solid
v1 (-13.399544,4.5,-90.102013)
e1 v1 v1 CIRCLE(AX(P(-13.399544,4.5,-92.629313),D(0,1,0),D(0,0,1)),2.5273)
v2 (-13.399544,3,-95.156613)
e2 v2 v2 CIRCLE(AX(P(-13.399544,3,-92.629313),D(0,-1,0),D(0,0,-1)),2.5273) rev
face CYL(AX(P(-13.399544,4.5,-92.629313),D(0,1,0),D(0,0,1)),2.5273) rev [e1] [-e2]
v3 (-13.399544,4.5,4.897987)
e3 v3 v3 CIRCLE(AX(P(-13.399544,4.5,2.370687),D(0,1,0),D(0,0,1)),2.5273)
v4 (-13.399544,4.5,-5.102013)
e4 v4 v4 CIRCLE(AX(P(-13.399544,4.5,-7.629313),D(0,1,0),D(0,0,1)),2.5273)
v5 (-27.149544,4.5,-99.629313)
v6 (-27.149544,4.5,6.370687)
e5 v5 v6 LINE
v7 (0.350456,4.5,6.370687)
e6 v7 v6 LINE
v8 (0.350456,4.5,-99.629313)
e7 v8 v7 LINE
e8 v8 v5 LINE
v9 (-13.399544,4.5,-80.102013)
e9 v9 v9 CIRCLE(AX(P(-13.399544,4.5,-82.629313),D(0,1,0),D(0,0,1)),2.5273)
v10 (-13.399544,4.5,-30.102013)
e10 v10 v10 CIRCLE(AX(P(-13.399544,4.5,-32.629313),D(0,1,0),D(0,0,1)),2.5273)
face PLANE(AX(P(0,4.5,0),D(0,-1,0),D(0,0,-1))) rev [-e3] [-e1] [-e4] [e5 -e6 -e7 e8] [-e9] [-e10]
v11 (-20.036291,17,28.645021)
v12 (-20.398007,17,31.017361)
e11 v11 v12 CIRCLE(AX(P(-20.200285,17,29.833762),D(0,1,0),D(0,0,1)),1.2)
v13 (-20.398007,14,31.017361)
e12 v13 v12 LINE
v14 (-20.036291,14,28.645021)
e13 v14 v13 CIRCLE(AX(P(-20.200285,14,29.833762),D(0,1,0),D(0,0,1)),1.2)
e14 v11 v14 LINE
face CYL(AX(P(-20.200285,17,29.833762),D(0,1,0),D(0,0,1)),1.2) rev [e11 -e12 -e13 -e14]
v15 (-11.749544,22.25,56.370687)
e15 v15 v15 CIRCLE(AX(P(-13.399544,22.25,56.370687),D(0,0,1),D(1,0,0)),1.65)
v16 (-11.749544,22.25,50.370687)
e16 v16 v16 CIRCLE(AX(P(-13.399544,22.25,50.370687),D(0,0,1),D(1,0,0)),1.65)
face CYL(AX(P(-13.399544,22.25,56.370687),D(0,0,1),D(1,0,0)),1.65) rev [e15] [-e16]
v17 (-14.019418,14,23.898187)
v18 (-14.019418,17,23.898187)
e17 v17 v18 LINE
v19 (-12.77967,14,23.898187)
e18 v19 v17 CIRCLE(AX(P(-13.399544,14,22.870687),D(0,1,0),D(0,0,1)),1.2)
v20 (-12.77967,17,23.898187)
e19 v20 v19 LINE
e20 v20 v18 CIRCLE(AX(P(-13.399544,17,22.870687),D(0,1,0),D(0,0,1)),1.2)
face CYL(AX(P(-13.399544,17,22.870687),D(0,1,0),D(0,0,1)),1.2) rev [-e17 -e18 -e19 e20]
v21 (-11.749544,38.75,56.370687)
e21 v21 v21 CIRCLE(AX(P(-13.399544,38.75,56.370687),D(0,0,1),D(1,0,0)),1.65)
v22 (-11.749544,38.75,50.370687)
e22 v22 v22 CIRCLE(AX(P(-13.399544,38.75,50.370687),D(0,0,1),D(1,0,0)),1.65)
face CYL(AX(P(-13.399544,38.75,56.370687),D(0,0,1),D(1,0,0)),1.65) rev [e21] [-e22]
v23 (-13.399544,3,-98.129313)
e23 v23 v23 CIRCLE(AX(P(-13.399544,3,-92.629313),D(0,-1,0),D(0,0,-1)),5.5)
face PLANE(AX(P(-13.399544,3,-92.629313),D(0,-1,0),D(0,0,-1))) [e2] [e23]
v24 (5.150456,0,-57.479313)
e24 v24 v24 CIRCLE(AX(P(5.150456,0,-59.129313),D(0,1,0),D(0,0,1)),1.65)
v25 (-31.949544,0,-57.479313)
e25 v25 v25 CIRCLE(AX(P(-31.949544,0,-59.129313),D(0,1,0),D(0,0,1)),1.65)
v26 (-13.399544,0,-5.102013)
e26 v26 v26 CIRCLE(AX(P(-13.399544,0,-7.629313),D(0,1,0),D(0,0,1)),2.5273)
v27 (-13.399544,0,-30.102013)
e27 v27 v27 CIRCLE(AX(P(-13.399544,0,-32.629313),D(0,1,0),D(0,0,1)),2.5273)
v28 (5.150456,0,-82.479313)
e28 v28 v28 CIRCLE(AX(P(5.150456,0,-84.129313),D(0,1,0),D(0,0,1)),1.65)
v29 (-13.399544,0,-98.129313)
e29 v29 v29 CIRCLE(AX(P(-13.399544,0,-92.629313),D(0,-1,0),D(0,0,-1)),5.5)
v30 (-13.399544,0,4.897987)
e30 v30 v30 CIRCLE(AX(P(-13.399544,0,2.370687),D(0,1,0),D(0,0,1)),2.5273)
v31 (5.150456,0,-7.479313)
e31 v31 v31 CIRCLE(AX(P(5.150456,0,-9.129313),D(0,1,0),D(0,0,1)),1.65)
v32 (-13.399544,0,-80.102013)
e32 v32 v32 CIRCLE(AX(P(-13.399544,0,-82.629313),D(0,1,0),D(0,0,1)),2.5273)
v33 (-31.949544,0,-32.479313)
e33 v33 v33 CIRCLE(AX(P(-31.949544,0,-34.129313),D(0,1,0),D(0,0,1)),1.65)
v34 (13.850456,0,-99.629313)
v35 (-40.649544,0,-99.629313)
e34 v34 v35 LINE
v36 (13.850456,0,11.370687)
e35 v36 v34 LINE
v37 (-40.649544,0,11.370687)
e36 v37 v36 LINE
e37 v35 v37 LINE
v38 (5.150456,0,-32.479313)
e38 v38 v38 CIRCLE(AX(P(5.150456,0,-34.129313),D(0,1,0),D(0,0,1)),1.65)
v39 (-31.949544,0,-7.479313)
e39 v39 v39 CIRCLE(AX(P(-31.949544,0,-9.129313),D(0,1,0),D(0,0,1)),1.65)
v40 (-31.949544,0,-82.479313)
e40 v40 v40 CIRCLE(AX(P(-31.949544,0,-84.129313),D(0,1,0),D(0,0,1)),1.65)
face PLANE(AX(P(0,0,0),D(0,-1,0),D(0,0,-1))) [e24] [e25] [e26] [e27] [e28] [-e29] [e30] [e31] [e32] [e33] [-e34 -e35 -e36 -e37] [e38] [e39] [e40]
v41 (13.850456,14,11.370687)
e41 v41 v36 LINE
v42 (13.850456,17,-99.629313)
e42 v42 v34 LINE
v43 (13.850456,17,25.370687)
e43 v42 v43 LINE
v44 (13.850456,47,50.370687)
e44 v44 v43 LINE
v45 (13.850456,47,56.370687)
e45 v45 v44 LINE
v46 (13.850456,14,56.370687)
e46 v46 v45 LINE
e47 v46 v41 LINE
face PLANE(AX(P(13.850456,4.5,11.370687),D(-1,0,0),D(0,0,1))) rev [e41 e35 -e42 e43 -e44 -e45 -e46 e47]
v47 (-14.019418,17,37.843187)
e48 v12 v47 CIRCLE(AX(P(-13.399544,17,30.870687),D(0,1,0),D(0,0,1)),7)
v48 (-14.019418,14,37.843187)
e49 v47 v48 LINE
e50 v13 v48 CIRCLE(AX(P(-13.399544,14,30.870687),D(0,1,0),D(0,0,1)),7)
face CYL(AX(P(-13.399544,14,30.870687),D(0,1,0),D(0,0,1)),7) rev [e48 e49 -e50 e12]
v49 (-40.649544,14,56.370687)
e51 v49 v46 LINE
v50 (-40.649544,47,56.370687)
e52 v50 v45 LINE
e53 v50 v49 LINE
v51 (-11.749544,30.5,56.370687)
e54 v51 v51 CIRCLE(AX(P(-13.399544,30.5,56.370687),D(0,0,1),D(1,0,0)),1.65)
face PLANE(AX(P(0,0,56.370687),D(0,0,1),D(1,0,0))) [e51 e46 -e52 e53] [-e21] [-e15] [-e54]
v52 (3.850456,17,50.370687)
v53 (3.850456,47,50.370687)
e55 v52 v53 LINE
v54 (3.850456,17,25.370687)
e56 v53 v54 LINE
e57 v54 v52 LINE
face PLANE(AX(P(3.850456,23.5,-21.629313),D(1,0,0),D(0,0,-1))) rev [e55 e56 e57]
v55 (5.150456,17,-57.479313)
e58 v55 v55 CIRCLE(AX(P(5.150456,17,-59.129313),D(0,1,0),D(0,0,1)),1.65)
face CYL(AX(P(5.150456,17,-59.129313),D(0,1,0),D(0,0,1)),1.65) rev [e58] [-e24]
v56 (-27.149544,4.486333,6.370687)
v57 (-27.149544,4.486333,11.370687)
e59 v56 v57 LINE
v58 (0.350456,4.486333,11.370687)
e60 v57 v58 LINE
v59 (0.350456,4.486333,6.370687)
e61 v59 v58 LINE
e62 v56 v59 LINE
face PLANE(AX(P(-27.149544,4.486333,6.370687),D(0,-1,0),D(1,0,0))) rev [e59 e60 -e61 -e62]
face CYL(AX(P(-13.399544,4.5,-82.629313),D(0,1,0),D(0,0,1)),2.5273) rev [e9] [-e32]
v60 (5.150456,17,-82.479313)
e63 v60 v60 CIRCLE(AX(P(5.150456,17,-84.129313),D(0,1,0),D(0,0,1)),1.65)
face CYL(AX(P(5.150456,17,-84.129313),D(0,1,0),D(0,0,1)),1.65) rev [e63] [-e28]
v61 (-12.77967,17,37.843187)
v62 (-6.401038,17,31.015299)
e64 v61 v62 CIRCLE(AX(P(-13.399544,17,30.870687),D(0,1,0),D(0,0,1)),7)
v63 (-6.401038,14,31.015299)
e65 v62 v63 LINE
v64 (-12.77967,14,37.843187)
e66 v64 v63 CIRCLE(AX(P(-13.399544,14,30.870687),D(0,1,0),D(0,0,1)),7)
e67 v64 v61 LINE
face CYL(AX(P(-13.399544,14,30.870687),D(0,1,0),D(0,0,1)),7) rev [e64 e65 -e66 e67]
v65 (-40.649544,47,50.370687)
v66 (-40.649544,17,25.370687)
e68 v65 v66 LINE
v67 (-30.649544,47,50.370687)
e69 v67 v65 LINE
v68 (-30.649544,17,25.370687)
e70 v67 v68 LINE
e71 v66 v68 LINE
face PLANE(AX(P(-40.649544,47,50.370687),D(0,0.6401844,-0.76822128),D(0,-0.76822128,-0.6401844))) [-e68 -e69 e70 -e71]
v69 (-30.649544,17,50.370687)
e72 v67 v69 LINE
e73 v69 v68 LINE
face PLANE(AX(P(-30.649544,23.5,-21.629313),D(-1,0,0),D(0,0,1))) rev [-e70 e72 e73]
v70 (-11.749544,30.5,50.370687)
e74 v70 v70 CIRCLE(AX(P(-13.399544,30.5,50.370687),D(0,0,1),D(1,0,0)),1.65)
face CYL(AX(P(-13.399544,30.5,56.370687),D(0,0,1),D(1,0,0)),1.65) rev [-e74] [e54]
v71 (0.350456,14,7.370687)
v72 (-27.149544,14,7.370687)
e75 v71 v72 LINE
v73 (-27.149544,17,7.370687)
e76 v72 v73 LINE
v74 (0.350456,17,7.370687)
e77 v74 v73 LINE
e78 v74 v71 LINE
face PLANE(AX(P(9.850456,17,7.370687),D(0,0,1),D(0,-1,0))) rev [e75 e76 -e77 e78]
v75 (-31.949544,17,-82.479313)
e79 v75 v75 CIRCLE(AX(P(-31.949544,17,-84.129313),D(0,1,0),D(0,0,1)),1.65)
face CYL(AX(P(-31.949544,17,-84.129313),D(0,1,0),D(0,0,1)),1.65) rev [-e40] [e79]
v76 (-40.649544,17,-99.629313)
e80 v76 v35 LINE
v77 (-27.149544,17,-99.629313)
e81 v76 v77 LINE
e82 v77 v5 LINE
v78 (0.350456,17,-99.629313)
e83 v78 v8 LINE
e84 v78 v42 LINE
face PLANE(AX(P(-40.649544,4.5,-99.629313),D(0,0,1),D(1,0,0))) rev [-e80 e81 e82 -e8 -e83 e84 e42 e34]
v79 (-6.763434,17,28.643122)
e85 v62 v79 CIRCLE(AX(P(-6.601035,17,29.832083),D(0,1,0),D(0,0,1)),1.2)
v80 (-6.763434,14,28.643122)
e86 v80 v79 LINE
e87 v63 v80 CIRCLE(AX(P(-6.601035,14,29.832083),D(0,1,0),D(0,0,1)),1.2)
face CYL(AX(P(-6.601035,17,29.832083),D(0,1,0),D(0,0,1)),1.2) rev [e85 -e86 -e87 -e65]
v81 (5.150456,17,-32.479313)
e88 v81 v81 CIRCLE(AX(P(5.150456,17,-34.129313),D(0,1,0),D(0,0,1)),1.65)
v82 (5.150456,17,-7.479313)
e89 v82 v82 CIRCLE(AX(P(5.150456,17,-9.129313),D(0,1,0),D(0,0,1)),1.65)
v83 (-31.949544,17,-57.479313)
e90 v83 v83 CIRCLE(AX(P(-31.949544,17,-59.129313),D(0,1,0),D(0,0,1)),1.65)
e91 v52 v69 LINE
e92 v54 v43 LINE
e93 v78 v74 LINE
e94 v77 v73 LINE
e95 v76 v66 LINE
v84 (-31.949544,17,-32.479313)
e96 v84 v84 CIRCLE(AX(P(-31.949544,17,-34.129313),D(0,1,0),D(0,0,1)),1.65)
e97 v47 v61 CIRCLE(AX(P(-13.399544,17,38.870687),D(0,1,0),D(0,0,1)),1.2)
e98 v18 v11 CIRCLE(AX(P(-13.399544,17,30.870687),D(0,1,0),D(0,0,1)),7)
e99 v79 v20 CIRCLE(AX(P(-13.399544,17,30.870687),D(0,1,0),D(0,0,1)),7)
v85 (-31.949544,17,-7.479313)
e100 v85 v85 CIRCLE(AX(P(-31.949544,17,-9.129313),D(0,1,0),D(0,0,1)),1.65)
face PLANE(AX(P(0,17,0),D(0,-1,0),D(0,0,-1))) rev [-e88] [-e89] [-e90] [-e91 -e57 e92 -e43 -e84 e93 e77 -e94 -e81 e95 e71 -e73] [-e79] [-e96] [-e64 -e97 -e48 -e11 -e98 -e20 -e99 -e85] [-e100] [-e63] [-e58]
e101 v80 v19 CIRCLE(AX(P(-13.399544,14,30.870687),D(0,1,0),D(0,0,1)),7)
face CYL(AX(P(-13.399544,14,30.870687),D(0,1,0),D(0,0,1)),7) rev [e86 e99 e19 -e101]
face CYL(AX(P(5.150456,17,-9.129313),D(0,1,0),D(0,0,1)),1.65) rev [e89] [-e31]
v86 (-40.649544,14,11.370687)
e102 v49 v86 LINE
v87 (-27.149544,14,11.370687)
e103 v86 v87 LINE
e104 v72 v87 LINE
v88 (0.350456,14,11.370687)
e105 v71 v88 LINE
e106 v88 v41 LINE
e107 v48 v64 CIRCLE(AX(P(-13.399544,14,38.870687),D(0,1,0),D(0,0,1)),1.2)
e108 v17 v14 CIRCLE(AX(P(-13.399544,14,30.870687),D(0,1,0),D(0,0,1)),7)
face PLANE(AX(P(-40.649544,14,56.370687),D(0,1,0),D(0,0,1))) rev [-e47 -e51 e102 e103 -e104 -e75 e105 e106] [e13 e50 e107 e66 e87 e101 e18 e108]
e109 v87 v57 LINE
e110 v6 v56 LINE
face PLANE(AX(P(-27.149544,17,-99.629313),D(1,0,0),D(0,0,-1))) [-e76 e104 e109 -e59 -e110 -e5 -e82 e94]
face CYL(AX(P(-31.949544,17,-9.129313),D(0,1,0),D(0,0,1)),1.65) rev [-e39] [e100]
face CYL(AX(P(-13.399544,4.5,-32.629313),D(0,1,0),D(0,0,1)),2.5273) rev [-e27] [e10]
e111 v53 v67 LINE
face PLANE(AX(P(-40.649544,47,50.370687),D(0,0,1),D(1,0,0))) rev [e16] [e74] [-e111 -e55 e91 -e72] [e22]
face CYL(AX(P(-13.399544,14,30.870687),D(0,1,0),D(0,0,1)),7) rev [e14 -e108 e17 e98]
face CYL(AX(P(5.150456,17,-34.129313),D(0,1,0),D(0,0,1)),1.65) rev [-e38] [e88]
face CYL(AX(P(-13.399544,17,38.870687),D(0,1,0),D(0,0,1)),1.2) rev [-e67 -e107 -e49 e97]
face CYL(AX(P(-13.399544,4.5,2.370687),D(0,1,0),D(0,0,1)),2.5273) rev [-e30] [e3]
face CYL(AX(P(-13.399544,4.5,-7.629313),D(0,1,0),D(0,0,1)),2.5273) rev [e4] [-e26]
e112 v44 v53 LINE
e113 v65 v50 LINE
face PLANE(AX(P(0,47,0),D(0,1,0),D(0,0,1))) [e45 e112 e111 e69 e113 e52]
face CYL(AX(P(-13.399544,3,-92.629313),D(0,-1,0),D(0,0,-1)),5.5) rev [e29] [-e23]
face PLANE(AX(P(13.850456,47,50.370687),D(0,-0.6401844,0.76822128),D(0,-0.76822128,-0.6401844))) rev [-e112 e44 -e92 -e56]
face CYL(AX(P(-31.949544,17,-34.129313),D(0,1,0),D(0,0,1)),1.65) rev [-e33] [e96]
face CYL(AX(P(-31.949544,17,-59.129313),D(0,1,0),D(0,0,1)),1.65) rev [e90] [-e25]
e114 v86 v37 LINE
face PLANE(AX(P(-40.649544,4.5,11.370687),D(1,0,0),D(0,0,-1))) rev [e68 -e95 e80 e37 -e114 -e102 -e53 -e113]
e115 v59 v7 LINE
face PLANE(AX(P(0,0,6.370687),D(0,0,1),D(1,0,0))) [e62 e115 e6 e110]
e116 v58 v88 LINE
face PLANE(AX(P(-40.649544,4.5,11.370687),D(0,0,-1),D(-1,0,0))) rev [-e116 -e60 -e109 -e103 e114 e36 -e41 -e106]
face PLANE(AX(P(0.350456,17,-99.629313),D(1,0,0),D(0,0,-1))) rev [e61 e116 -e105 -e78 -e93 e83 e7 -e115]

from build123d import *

# Parameters (mm, degrees)
SKETCH1_W                           = 54.5
SKETCH1_H                           = 111
BOSS_EXTRUDE1_DEPTH                 = 4.5
SKETCH2_W                           = 13.5
SKETCH2_H                           = 111
BOSS_EXTRUDE2_DEPTH                 = 12.5
M4X0_7_TAPPED_HOLE1_D               = 3.3
SKETCH6_W                           = 4
SKETCH6_H                           = 12.5
BOSS_EXTRUDE3_DEPTH                 = 37
SKETCH7_W                           = 54.5
SKETCH7_H                           = 3
BOSS_EXTRUDE5_DEPTH                 = 45
SKETCH8_R                           = 7
CUT_EXTRUDE1_DEPTH                  = 3
M2_CLEARANCE_HOLE1_D                = 2.4
F_8_0_199_DIAMETER_HOLE1_D          = 5.0546
SKETCH12_R                          = 5.5
CUT_EXTRUDE3_DEPTH                  = 3
SKETCH13_W                          = 27.5
SKETCH13_H                          = 9.513667368
CUT_EXTRUDE4_DEPTH                  = 5
SKETCH14_W                          = 54.5
SKETCH14_H                          = 6
BOSS_EXTRUDE6_DEPTH                 = 30
RIB6_REACH                          = 124.903
SKETCH20_WALL_W                     = 286.858082508
SKETCH20_WALL_H                     = 10
TAP_START                           = 50.370687416
TAP_DRILL_FOR_M4X0_7_TAP1_OUTLINE_R = 1.65
TAP_DRILL_FOR_M4X0_7_TAP1_DEPTH     = 6
TAP_START_2                         = -40.649543841
TAP_DRILL_FOR_M4X0_7_TAP1_2_DEPTH   = 10


with BuildPart() as part:
    # Sketch1 → Boss-Extrude1 (new body)
    with BuildSketch(Plane(origin=(0, 0, 0), x_dir=(1, 0, 0), z_dir=(0, 1, 0))):
        with Locations((-13.399543841, 44.129312584)):
            Rectangle(SKETCH1_W, SKETCH1_H)
    extrude(amount=BOSS_EXTRUDE1_DEPTH)

    # Sketch2 → Boss-Extrude2 (add)
    with BuildSketch(Plane(origin=(0, 4.5, 0), x_dir=(1, 0, 0), z_dir=(0, 1, 0))):
        with Locations((7.100456159, 44.129312584)):
            Rectangle(SKETCH2_W, SKETCH2_H)
        with Locations((-33.899543841, 44.129312584)):
            Rectangle(SKETCH2_W, SKETCH2_H)
    extrude(amount=BOSS_EXTRUDE2_DEPTH)

    # M4x0.7 Tapped Hole1 (through all)
    with Locations(Plane(origin=(-31.949543841, 17, -9.129312584), x_dir=(0, 0, 1), z_dir=(0, 1, 0))):
        with Locations((0, 0), (-25, 0), (-50, 0), (-75, 0), (0, 37.1), (-25, 37.1), (-50, 37.1), (-75, 37.1)):
            Hole(M4X0_7_TAPPED_HOLE1_D / 2)

    # Sketch6 → Boss-Extrude3 (add)
    with BuildSketch(Plane(origin=(-27.149543841, 0, 0), x_dir=(0, 0, -1), z_dir=(1, 0, 0))):
        with Locations((-9.370687416, 10.75)):
            Rectangle(SKETCH6_W, SKETCH6_H)
    extrude(amount=BOSS_EXTRUDE3_DEPTH)

    # Sketch7 → Boss-Extrude5 (add)
    with BuildSketch(Plane.XY.offset(11.370687416)):
        with Locations((-13.399543841, 15.5)):
            Rectangle(SKETCH7_W, SKETCH7_H)
    extrude(amount=BOSS_EXTRUDE5_DEPTH)

    # Sketch8 → Cut-Extrude1 (cut)
    with BuildSketch(Plane(origin=(0, 17, 0), x_dir=(1, 0, 0), z_dir=(0, 1, 0))):
        with Locations(Location((-13.399543841, -30.870687416, 0), (0, 0, 270))):
            Circle(SKETCH8_R)
    extrude(amount=-CUT_EXTRUDE1_DEPTH, mode=Mode.SUBTRACT)

    # M2 Clearance Hole1 (through all)
    with Locations(Plane(origin=(-20.200285158, 17, 29.83376219), x_dir=(0, 0, 1), z_dir=(0, 1, 0))):
        with Locations((0, 0), (-6.963074774, 6.800741317), (9.036925226, 6.800741317), (-0.001679632, 13.599250141)):
            Hole(M2_CLEARANCE_HOLE1_D / 2)

    # #8 (0.199) Diameter Hole1 (through all)
    with Locations(Plane(origin=(-13.399543841, 4.5, 2.370687416), x_dir=(0, 0, 1), z_dir=(0, 1, 0))):
        with Locations((0, 0), (-10, 0), (-35, 0), (-85, 0), (-95, 0)):
            Hole(F_8_0_199_DIAMETER_HOLE1_D / 2)

    # Sketch12 → Cut-Extrude3 (cut)
    with BuildSketch(Plane(origin=(0, 0, 0), x_dir=(-1, 0, 0), z_dir=(0, -1, 0))):
        with Locations(Location((13.399543841, 92.629312584, 0), (0, 0, 90))):
            Circle(SKETCH12_R)
    extrude(amount=-CUT_EXTRUDE3_DEPTH, mode=Mode.SUBTRACT)

    # Sketch13 → Cut-Extrude4 (cut)
    with BuildSketch(Plane.XY.offset(11.370687416)):
        with Locations((-13.399543841, 9.243166316)):
            Rectangle(SKETCH13_W, SKETCH13_H)
    extrude(amount=-CUT_EXTRUDE4_DEPTH, mode=Mode.SUBTRACT)

    # Sketch14 → Boss-Extrude6 (add)
    with BuildSketch(Plane(origin=(0, 17, 0), x_dir=(1, 0, 0), z_dir=(0, 1, 0))):
        with Locations((-13.399543841, -53.370687416)):
            Rectangle(SKETCH14_W, SKETCH14_H)
    extrude(amount=BOSS_EXTRUDE6_DEPTH)

    # Sketch20 wall → Rib6 (add, up to next)
    with BuildSketch(Plane(origin=(13.850456159, 32, 37.870687416), x_dir=(0, -0.768221279597, -0.640184399664), z_dir=(0, 0.640184399664, -0.768221279597)), mode=Mode.PRIVATE) as rib6_sk1:
        with Locations((0, 5)):
            Rectangle(SKETCH20_WALL_W, SKETCH20_WALL_H)
    rib6_tool1 = extrude(rib6_sk1.sketch, amount=-RIB6_REACH, mode=Mode.PRIVATE) - part.part
    add(rib6_tool1.solids().sort_by_distance((13.850456159, 32, 37.870687416))[0])

    # Tap Drill for M4x0.7 Tap1: read off the stored shape, not the designer's step
    # Tap Drill for M4x0.7 Tap1 outline → Tap Drill for M4x0.7 Tap1 (cut)
    with BuildSketch(Plane.XY.offset(TAP_START)):
        with Locations((-13.399543841, 30.5)):
            Circle(TAP_DRILL_FOR_M4X0_7_TAP1_OUTLINE_R)
        with Locations((-13.399543841, 38.75)):
            Circle(TAP_DRILL_FOR_M4X0_7_TAP1_OUTLINE_R)
        with Locations((-13.399543841, 22.25)):
            Circle(TAP_DRILL_FOR_M4X0_7_TAP1_OUTLINE_R)
    extrude(amount=TAP_DRILL_FOR_M4X0_7_TAP1_DEPTH, mode=Mode.SUBTRACT)

    # Tap Drill for M4x0.7 Tap1 2 outline → Tap Drill for M4x0.7 Tap1 2 (add)
    with BuildSketch(Plane.YZ.offset(TAP_START_2)):
        Polygon((17, 50.370687416), (17, 25.370687416), (47, 50.370687416), align=None)
    extrude(amount=TAP_DRILL_FOR_M4X0_7_TAP1_2_DEPTH)


solid = part.part
